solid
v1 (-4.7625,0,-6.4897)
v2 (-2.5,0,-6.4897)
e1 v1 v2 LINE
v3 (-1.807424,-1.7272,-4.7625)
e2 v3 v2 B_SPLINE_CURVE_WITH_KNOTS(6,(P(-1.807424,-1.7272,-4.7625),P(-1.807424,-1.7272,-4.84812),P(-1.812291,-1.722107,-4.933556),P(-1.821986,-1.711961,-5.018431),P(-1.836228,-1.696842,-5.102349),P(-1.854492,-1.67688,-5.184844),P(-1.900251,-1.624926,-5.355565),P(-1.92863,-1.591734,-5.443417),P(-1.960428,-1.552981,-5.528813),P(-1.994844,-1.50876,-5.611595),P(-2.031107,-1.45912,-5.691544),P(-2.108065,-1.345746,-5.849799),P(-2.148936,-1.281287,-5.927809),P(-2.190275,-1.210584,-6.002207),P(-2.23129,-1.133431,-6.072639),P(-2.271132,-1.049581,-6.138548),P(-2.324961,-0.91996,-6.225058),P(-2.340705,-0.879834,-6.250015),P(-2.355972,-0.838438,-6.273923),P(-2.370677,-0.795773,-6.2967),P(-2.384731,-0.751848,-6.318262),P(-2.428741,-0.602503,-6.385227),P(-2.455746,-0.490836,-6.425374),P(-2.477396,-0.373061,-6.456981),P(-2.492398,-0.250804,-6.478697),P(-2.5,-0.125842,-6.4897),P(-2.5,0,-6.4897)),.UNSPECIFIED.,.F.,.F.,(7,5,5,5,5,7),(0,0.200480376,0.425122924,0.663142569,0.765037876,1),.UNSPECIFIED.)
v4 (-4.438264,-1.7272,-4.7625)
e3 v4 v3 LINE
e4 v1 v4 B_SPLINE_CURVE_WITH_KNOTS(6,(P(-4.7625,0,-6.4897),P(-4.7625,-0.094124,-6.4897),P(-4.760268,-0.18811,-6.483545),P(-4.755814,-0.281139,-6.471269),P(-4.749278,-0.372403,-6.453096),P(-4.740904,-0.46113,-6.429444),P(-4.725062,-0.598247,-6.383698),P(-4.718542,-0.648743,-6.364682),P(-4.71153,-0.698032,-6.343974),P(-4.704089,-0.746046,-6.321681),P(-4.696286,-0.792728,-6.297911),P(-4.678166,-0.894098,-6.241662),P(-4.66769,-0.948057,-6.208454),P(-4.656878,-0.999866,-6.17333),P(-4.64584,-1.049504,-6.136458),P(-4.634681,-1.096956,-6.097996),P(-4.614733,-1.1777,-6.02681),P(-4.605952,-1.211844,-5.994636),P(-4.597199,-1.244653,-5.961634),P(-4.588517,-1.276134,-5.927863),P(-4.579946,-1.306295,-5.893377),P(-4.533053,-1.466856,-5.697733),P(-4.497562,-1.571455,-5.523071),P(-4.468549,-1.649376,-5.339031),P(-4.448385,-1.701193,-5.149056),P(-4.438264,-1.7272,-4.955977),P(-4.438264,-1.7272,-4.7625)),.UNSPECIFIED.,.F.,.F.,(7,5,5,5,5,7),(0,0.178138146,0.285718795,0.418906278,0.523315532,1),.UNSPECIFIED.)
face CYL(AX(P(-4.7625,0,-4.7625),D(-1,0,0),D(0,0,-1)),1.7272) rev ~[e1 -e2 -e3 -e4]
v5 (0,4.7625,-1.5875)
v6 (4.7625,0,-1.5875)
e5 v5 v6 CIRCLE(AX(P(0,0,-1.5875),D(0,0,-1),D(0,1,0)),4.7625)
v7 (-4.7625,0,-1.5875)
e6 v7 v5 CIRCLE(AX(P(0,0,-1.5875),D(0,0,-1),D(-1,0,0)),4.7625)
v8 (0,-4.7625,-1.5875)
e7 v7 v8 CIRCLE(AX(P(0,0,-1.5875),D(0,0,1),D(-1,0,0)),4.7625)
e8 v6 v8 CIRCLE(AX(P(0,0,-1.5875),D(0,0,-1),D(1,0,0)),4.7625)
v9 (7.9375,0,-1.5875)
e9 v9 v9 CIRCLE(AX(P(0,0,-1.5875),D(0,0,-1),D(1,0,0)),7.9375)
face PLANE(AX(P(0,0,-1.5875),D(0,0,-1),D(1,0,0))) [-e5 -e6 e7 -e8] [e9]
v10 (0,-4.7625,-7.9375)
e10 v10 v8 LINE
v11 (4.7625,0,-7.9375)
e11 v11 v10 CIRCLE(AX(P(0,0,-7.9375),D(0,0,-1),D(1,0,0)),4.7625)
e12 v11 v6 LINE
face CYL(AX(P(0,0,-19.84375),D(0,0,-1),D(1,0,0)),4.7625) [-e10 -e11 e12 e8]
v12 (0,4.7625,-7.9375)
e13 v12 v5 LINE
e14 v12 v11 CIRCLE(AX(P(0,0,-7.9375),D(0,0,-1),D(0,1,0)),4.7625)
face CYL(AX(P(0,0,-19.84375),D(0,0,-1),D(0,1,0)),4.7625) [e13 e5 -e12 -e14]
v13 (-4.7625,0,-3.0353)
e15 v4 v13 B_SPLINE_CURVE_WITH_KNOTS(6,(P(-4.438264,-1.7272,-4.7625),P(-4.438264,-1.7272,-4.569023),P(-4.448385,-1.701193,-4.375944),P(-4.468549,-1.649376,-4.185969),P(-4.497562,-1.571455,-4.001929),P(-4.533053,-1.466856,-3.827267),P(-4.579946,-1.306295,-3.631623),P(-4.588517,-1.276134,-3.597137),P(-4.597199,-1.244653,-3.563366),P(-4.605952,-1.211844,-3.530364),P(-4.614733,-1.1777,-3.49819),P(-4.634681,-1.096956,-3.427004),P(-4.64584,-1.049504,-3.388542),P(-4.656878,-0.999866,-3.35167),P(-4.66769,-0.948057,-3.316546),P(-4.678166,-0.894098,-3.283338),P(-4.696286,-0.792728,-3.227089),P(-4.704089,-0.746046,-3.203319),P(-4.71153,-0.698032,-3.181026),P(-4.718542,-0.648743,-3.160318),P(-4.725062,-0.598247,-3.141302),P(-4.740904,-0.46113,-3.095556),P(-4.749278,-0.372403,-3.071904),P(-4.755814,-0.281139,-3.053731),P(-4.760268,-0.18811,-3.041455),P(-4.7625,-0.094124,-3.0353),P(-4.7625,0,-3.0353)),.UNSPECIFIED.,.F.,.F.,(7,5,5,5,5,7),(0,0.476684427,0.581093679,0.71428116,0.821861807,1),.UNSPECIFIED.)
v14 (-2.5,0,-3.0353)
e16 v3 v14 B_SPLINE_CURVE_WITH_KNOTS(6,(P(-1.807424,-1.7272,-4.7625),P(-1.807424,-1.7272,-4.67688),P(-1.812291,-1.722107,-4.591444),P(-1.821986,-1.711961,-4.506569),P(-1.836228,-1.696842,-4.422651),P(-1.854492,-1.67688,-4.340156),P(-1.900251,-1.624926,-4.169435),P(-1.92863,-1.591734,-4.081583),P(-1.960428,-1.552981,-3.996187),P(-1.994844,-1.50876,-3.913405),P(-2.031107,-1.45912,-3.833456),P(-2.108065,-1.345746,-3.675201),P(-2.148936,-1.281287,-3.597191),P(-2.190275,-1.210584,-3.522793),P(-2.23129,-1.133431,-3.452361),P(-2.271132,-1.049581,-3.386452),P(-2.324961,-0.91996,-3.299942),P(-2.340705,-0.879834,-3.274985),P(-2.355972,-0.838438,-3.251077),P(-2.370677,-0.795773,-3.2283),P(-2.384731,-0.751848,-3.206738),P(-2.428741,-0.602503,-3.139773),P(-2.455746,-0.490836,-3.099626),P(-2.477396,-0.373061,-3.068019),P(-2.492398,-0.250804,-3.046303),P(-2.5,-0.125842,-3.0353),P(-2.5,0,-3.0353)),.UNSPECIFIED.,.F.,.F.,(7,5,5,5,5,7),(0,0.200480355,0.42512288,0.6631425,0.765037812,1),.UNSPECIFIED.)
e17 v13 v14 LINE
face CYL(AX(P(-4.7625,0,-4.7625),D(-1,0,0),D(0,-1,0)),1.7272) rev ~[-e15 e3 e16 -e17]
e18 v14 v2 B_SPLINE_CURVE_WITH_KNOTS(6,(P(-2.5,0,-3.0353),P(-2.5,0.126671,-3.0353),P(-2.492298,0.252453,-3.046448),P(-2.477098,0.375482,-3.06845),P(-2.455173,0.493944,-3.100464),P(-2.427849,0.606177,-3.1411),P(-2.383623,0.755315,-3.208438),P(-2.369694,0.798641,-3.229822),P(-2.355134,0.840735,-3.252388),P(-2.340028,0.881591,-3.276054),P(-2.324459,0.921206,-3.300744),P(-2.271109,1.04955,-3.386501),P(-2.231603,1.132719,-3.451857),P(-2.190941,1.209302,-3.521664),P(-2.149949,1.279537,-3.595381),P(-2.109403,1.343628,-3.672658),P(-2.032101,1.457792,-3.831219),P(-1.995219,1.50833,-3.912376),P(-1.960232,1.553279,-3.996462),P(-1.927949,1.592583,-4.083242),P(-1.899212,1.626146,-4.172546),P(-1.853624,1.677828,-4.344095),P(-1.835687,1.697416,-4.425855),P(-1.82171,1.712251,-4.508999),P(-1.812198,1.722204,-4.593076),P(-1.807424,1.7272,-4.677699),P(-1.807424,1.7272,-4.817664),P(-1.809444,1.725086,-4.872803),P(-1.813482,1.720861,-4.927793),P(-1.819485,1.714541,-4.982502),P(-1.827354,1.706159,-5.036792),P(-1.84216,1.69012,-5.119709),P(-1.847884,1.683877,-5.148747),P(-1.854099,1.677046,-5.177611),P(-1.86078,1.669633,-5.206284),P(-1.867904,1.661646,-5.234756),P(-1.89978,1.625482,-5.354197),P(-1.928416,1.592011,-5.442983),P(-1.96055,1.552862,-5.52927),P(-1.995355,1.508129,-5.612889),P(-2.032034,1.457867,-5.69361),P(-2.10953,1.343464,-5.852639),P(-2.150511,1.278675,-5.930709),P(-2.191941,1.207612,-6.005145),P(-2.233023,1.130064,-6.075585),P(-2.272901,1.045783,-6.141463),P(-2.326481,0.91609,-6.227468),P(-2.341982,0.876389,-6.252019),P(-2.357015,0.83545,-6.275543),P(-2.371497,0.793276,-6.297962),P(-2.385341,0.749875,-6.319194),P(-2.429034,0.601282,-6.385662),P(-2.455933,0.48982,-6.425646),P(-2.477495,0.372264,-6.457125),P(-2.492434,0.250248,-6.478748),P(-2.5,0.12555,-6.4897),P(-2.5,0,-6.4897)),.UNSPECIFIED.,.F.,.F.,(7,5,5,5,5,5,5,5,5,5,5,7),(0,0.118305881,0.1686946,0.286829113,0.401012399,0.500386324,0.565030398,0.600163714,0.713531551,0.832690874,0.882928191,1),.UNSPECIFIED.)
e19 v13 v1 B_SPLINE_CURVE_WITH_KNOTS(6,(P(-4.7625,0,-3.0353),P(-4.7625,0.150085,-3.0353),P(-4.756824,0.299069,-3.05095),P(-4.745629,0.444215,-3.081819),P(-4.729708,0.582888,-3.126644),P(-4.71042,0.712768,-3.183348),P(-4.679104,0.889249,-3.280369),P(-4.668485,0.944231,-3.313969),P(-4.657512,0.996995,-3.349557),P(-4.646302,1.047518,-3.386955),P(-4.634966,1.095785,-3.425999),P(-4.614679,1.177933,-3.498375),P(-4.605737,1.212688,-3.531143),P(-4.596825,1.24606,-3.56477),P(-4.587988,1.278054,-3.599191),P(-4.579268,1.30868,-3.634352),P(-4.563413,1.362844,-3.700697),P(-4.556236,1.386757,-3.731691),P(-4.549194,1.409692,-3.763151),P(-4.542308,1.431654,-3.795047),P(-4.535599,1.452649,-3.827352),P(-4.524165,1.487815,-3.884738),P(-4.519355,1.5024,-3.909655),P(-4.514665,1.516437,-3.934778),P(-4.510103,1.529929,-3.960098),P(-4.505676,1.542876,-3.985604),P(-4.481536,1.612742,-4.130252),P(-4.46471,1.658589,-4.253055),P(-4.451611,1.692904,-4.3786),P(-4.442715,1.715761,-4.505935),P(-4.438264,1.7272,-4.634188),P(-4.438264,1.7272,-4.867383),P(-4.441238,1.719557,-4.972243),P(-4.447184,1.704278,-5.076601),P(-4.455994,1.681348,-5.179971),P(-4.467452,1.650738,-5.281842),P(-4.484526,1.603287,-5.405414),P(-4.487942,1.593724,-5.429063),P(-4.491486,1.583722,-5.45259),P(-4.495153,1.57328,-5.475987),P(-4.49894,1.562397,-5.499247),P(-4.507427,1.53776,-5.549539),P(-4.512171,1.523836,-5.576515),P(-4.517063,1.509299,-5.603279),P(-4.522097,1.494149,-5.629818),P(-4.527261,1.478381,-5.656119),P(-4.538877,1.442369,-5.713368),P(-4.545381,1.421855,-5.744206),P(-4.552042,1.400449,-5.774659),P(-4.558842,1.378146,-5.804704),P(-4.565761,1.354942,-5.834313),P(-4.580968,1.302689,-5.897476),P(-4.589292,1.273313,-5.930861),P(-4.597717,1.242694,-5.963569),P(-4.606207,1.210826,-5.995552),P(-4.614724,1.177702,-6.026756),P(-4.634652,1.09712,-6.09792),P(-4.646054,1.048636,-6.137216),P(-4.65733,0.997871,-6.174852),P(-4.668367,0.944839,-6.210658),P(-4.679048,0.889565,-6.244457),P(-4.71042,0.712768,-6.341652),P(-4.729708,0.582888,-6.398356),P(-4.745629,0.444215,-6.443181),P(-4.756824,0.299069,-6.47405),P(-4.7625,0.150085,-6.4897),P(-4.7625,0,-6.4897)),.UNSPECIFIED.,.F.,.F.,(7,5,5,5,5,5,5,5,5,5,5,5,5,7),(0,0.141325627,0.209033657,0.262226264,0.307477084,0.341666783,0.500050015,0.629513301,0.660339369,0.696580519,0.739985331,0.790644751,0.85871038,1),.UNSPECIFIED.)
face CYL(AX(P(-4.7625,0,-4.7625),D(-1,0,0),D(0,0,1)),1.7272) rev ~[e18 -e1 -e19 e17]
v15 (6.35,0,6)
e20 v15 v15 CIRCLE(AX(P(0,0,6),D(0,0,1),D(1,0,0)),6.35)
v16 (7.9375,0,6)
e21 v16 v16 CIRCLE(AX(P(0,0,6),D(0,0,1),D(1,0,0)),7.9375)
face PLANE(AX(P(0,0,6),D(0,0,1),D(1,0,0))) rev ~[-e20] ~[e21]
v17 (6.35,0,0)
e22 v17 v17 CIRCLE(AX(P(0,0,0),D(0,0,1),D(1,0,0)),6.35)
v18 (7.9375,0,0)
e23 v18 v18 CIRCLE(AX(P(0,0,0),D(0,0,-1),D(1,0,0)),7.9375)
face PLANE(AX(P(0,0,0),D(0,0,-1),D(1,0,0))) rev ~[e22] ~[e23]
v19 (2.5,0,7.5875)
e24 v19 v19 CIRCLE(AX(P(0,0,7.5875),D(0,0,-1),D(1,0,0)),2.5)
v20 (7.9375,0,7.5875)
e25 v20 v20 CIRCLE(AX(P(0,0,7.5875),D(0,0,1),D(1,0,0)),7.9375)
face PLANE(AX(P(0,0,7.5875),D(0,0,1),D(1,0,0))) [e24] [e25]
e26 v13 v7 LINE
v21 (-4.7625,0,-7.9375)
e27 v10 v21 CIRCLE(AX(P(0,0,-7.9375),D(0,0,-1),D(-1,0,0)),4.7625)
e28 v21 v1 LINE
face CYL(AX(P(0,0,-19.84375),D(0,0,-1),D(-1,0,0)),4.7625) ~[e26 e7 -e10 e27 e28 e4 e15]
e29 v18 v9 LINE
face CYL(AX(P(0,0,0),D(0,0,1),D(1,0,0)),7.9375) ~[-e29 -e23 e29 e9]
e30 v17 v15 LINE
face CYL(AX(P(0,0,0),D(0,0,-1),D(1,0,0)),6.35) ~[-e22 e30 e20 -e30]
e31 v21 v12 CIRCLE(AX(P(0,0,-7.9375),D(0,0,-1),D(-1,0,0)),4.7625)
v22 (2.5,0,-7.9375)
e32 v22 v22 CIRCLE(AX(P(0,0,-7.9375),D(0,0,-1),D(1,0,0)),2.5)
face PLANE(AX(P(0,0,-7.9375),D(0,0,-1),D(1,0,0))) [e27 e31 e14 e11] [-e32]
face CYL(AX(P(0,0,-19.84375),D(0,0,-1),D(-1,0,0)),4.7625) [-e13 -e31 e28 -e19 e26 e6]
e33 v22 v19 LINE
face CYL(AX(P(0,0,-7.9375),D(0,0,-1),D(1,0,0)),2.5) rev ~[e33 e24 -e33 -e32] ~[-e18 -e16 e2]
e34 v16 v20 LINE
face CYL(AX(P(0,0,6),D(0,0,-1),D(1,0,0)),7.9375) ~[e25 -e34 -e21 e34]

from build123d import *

# Parameters (mm, degrees)
F0_R         = 6.35
F1_DEPTH     = 6
F2_R         = 7.9375
F3_DEPTH     = 1.5875
F4_R         = 7.9375
F5_DEPTH     = 1.5875
F6_W         = 9.525
F6_H         = 9.525
F7_DEPTH     = 6.35
F8_R         = 2.5
F9_DEPTH     = 15.525
F11_REACH    = 16.5631366107
F12_T1_DEPTH = 18.25625


# Not quite as in the source:
# - a fillet or chamfer that OpenCascade refuses, or shapes differently, is made with other operations: its cross-section is extruded or revolved along the edge and cut away or added


with BuildPart() as f1:
    # F0 (on Top) → F1 (new body)
    with BuildSketch(Plane.XY):
        Circle(F0_R)
    extrude(amount=F1_DEPTH)

    # F2 (on face) → F3 (join)
    with BuildSketch(Plane.XY.offset(6)):
        Circle(F2_R)
    extrude(amount=F3_DEPTH)

    # F4 (on face) → F5 (join)
    with BuildSketch(Plane(origin=(0, 0, 0), x_dir=(1, 0, 0), z_dir=(0, 0, -1))):
        Circle(F4_R)
    extrude(amount=F5_DEPTH)

    # F6 (on face) → F7 (join)
    with BuildSketch(Plane(origin=(0, 0, -1.5875), x_dir=(1, 0, 0), z_dir=(0, 0, -1))):
        Rectangle(F6_W, F6_H)
    extrude(amount=F7_DEPTH)

    # F8 (on face) → F9 (cut, through all)
    with BuildSketch(Plane(origin=(0, 0, -7.9375), x_dir=(1, 0, 0), z_dir=(0, 0, -1))):
        Circle(F8_R)
    extrude(amount=-F9_DEPTH, mode=Mode.SUBTRACT)

    f11_end = f1.faces().sort_by_distance((-2.5, 0, -0.175))[0]
    # F10 (on face) → F11 (cut, up to a face of the model that its end follows)
    with BuildSketch(Plane(origin=(-4.7625, 0, 0), x_dir=(0, -1, 0), z_dir=(-1, 0, 0))):
        with BuildLine():
            ThreePointArc((0, -3.0353), (-1.7272, -4.7625), (0, -6.4897))
            Line((0, -6.4897), (0, -3.0353))
        make_face()
        with BuildLine():
            Line((0, -3.0353), (0, -6.4897))
            ThreePointArc((0, -6.4897), (1.2213148325, -5.9838148325), (1.7272, -4.7625))
            ThreePointArc((1.7272, -4.7625), (1.2213148325, -3.5411851675), (0, -3.0353))
        make_face()
    f11_long = extrude(amount=-F11_REACH, mode=Mode.PRIVATE)
    add(split(f11_long, bisect_by=f11_end, keep=Keep.ALL, mode=Mode.PRIVATE).solids().sort_by_distance((-4.7625, 0, -4.7625))[0], mode=Mode.SUBTRACT)

    # F12: fillet of radius 4.7625 on 4 edges, made by hand

    # F12_s2 → F12_t1 (cut)
    with BuildSketch(Plane.XY.offset(-19.84375)):
        with BuildLine():
            ThreePointArc((-4.7625, 0), (-3.3675960454, -3.3675960454), (0, -4.7625))
            Line((0, -4.7625), (-4.7625, -4.7625))
            Line((-4.7625, -4.7625), (-4.7625, 0))
        make_face()
        with BuildLine():
            ThreePointArc((-4.7625, 0), (-3.3675960454, 3.3675960454), (0, 4.7625))
            Line((0, 4.7625), (-4.7625, 4.7625))
            Line((-4.7625, 4.7625), (-4.7625, 0))
        make_face()
        with BuildLine():
            ThreePointArc((0, 4.7625), (3.3675960454, 3.3675960454), (4.7625, 0))
            Line((4.7625, 0), (4.7625, 4.7625))
            Line((4.7625, 4.7625), (0, 4.7625))
        make_face()
        with BuildLine():
            ThreePointArc((4.7625, 0), (3.3675960454, -3.3675960454), (0, -4.7625))
            Line((0, -4.7625), (4.7625, -4.7625))
            Line((4.7625, -4.7625), (4.7625, 0))
        make_face()
    extrude(amount=F12_T1_DEPTH, mode=Mode.SUBTRACT)


solid = f1.part
